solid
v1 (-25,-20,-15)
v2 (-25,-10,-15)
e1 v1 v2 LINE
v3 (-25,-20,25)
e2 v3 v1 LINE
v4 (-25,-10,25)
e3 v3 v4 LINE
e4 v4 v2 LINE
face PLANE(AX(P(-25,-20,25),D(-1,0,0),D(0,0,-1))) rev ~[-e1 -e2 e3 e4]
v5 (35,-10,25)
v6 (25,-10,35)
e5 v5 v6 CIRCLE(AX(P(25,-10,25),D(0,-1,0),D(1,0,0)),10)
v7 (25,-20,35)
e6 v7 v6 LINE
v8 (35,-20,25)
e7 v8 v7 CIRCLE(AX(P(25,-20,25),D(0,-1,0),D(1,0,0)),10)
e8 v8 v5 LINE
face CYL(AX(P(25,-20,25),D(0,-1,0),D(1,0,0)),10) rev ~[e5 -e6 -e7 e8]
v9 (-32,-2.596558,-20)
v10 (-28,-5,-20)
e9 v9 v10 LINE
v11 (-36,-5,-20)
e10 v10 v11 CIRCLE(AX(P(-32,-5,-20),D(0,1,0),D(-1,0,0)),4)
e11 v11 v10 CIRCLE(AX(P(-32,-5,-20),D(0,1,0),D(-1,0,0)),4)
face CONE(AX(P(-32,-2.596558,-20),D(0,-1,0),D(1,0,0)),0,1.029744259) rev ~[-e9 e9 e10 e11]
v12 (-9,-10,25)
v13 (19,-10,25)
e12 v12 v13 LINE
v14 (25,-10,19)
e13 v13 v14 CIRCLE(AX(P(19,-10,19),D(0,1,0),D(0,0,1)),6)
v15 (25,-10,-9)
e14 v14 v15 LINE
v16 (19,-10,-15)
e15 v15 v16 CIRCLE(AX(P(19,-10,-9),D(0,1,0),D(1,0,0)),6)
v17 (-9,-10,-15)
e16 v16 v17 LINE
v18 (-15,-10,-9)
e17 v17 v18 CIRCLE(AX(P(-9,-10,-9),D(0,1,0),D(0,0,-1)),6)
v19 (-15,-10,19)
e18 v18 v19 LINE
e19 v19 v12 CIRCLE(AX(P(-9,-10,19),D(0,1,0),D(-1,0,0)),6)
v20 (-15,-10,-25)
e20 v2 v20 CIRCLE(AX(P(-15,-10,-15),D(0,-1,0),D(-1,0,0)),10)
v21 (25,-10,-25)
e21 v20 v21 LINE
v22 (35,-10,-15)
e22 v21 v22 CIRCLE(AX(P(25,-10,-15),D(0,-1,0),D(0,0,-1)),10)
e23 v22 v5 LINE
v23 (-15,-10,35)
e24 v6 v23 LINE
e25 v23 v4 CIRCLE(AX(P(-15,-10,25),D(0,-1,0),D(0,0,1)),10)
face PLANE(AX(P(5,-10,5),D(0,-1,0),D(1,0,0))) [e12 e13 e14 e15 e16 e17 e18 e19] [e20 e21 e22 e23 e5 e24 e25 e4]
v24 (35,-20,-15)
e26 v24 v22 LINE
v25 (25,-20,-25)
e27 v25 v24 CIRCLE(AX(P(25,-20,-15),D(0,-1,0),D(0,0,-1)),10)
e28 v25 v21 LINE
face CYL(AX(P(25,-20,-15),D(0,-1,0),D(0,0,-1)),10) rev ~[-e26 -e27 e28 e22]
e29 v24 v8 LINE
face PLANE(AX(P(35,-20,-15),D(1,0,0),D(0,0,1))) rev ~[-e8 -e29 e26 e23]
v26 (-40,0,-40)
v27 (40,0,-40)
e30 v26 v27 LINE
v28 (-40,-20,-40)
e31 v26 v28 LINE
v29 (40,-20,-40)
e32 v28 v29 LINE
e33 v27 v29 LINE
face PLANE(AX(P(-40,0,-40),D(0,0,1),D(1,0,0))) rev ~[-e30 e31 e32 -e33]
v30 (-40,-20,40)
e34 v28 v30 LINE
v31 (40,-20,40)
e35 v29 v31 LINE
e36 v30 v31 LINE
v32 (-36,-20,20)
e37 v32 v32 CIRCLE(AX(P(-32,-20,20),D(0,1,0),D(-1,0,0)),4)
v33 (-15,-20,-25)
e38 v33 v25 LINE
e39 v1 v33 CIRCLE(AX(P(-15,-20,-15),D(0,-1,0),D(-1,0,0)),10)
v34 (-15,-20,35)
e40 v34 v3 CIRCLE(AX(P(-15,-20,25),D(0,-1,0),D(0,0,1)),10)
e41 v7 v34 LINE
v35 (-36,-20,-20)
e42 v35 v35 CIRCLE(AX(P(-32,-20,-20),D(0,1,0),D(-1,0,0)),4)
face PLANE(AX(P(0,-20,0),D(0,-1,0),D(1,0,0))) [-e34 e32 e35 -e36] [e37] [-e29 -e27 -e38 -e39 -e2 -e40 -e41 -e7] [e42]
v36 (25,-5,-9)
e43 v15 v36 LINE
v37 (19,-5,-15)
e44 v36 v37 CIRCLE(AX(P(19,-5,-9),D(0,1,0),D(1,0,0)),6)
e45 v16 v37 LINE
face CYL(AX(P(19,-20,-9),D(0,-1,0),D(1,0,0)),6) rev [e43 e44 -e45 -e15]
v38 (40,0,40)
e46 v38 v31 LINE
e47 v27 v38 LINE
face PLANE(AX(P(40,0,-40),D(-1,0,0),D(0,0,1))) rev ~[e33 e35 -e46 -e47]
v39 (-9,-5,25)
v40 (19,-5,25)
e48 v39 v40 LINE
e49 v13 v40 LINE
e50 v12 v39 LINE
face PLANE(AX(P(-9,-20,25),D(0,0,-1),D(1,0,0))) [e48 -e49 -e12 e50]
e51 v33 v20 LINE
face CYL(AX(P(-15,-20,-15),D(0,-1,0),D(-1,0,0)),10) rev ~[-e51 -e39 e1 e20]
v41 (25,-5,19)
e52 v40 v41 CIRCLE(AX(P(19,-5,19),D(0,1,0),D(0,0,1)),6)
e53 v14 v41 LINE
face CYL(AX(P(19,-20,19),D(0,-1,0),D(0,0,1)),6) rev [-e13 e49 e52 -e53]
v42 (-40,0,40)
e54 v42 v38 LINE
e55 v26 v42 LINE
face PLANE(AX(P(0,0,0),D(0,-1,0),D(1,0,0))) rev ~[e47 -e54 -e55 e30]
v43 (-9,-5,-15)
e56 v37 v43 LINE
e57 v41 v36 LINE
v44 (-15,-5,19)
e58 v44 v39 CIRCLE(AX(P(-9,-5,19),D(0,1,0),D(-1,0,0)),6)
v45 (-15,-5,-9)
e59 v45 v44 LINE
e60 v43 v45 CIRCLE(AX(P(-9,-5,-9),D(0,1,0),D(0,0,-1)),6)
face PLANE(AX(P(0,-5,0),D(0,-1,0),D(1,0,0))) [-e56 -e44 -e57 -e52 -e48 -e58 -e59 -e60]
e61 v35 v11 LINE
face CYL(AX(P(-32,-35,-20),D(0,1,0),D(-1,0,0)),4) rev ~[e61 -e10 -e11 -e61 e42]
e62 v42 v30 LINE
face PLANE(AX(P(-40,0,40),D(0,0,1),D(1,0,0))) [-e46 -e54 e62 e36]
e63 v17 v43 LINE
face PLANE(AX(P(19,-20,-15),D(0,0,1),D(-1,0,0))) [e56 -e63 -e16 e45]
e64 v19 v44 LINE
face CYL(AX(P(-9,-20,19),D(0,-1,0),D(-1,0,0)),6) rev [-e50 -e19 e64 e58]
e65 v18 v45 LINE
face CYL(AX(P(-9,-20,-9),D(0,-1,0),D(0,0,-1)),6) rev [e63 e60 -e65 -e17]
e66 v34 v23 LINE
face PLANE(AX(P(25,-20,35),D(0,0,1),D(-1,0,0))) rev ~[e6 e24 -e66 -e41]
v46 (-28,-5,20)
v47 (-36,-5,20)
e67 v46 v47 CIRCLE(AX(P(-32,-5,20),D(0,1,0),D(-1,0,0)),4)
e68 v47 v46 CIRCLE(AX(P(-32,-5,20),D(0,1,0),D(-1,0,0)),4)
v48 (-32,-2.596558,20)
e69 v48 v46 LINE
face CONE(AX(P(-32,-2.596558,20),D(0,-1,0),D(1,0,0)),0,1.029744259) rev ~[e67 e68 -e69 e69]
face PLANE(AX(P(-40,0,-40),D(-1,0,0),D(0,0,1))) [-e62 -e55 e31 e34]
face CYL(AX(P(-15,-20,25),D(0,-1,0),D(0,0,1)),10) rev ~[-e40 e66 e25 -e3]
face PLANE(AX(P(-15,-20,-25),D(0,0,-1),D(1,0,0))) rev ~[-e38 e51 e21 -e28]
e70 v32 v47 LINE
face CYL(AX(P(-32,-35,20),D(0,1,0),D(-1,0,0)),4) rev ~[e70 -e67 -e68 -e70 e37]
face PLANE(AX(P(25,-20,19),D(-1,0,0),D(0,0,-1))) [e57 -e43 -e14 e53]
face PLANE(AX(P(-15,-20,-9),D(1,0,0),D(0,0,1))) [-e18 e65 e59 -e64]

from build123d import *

# Parameters (mm, degrees)
F0_W     = 80
F0_H     = 80
F1_DEPTH = 20
F3_D     = 8
F3_DEPTH = 15
F3_TIP   = 2.4034424761
F5_DEPTH = 10
F6_DEPTH = 15


with BuildPart() as f1:
    # F0 (on Front) → F1 (new body)
    with BuildSketch(Plane.XZ):
        Rectangle(F0_W, F0_H)
    extrude(amount=F1_DEPTH)

    # F3
    with Locations(Plane.XZ.offset(20)):
        with Locations((-32, 20), (-32, -20)):
            Hole(F3_D / 2, depth=F3_DEPTH)
            with Locations((0, 0, -(F3_DEPTH + F3_TIP / 2))):  # 118° drill point
                Cone(0, F3_D / 2, F3_TIP, mode=Mode.SUBTRACT)

    # F4 (on face) → F5 (cut)
    with BuildSketch(Plane.XZ.offset(20)):
        with BuildLine():
            Line((25, 35), (-15, 35))
            ThreePointArc((-15, 35), (-22.0710678119, 32.0710678119), (-25, 25))
            Line((-25, 25), (-25, -15))
            ThreePointArc((-25, -15), (-22.0710678119, -22.0710678119), (-15, -25))
            Line((-15, -25), (25, -25))
            ThreePointArc((25, -25), (32.0710678119, -22.0710678119), (35, -15))
            Line((35, -15), (35, 25))
            ThreePointArc((35, 25), (32.0710678119, 32.0710678119), (25, 35))
        make_face()
        with BuildLine():
            ThreePointArc((-15, 19), (-13.2426406871, 23.2426406871), (-9, 25))
            Line((-9, 25), (19, 25))
            ThreePointArc((19, 25), (23.2426406871, 23.2426406871), (25, 19))
            Line((25, 19), (25, -9))
            ThreePointArc((25, -9), (23.2426406871, -13.2426406871), (19, -15))
            Line((19, -15), (-9, -15))
            ThreePointArc((-9, -15), (-13.2426406871, -13.2426406871), (-15, -9))
            Line((-15, -9), (-15, 19))
        make_face(mode=Mode.SUBTRACT)
    extrude(amount=-F5_DEPTH, mode=Mode.SUBTRACT)

    # F6 (cut): a face of the model
    f6_faces = [f1.faces().sort_by_distance(p)[0] for p in [
        (5, -20, 5),
    ]]
    extrude(f6_faces, amount=-F6_DEPTH, mode=Mode.SUBTRACT)


solid = f1.part
